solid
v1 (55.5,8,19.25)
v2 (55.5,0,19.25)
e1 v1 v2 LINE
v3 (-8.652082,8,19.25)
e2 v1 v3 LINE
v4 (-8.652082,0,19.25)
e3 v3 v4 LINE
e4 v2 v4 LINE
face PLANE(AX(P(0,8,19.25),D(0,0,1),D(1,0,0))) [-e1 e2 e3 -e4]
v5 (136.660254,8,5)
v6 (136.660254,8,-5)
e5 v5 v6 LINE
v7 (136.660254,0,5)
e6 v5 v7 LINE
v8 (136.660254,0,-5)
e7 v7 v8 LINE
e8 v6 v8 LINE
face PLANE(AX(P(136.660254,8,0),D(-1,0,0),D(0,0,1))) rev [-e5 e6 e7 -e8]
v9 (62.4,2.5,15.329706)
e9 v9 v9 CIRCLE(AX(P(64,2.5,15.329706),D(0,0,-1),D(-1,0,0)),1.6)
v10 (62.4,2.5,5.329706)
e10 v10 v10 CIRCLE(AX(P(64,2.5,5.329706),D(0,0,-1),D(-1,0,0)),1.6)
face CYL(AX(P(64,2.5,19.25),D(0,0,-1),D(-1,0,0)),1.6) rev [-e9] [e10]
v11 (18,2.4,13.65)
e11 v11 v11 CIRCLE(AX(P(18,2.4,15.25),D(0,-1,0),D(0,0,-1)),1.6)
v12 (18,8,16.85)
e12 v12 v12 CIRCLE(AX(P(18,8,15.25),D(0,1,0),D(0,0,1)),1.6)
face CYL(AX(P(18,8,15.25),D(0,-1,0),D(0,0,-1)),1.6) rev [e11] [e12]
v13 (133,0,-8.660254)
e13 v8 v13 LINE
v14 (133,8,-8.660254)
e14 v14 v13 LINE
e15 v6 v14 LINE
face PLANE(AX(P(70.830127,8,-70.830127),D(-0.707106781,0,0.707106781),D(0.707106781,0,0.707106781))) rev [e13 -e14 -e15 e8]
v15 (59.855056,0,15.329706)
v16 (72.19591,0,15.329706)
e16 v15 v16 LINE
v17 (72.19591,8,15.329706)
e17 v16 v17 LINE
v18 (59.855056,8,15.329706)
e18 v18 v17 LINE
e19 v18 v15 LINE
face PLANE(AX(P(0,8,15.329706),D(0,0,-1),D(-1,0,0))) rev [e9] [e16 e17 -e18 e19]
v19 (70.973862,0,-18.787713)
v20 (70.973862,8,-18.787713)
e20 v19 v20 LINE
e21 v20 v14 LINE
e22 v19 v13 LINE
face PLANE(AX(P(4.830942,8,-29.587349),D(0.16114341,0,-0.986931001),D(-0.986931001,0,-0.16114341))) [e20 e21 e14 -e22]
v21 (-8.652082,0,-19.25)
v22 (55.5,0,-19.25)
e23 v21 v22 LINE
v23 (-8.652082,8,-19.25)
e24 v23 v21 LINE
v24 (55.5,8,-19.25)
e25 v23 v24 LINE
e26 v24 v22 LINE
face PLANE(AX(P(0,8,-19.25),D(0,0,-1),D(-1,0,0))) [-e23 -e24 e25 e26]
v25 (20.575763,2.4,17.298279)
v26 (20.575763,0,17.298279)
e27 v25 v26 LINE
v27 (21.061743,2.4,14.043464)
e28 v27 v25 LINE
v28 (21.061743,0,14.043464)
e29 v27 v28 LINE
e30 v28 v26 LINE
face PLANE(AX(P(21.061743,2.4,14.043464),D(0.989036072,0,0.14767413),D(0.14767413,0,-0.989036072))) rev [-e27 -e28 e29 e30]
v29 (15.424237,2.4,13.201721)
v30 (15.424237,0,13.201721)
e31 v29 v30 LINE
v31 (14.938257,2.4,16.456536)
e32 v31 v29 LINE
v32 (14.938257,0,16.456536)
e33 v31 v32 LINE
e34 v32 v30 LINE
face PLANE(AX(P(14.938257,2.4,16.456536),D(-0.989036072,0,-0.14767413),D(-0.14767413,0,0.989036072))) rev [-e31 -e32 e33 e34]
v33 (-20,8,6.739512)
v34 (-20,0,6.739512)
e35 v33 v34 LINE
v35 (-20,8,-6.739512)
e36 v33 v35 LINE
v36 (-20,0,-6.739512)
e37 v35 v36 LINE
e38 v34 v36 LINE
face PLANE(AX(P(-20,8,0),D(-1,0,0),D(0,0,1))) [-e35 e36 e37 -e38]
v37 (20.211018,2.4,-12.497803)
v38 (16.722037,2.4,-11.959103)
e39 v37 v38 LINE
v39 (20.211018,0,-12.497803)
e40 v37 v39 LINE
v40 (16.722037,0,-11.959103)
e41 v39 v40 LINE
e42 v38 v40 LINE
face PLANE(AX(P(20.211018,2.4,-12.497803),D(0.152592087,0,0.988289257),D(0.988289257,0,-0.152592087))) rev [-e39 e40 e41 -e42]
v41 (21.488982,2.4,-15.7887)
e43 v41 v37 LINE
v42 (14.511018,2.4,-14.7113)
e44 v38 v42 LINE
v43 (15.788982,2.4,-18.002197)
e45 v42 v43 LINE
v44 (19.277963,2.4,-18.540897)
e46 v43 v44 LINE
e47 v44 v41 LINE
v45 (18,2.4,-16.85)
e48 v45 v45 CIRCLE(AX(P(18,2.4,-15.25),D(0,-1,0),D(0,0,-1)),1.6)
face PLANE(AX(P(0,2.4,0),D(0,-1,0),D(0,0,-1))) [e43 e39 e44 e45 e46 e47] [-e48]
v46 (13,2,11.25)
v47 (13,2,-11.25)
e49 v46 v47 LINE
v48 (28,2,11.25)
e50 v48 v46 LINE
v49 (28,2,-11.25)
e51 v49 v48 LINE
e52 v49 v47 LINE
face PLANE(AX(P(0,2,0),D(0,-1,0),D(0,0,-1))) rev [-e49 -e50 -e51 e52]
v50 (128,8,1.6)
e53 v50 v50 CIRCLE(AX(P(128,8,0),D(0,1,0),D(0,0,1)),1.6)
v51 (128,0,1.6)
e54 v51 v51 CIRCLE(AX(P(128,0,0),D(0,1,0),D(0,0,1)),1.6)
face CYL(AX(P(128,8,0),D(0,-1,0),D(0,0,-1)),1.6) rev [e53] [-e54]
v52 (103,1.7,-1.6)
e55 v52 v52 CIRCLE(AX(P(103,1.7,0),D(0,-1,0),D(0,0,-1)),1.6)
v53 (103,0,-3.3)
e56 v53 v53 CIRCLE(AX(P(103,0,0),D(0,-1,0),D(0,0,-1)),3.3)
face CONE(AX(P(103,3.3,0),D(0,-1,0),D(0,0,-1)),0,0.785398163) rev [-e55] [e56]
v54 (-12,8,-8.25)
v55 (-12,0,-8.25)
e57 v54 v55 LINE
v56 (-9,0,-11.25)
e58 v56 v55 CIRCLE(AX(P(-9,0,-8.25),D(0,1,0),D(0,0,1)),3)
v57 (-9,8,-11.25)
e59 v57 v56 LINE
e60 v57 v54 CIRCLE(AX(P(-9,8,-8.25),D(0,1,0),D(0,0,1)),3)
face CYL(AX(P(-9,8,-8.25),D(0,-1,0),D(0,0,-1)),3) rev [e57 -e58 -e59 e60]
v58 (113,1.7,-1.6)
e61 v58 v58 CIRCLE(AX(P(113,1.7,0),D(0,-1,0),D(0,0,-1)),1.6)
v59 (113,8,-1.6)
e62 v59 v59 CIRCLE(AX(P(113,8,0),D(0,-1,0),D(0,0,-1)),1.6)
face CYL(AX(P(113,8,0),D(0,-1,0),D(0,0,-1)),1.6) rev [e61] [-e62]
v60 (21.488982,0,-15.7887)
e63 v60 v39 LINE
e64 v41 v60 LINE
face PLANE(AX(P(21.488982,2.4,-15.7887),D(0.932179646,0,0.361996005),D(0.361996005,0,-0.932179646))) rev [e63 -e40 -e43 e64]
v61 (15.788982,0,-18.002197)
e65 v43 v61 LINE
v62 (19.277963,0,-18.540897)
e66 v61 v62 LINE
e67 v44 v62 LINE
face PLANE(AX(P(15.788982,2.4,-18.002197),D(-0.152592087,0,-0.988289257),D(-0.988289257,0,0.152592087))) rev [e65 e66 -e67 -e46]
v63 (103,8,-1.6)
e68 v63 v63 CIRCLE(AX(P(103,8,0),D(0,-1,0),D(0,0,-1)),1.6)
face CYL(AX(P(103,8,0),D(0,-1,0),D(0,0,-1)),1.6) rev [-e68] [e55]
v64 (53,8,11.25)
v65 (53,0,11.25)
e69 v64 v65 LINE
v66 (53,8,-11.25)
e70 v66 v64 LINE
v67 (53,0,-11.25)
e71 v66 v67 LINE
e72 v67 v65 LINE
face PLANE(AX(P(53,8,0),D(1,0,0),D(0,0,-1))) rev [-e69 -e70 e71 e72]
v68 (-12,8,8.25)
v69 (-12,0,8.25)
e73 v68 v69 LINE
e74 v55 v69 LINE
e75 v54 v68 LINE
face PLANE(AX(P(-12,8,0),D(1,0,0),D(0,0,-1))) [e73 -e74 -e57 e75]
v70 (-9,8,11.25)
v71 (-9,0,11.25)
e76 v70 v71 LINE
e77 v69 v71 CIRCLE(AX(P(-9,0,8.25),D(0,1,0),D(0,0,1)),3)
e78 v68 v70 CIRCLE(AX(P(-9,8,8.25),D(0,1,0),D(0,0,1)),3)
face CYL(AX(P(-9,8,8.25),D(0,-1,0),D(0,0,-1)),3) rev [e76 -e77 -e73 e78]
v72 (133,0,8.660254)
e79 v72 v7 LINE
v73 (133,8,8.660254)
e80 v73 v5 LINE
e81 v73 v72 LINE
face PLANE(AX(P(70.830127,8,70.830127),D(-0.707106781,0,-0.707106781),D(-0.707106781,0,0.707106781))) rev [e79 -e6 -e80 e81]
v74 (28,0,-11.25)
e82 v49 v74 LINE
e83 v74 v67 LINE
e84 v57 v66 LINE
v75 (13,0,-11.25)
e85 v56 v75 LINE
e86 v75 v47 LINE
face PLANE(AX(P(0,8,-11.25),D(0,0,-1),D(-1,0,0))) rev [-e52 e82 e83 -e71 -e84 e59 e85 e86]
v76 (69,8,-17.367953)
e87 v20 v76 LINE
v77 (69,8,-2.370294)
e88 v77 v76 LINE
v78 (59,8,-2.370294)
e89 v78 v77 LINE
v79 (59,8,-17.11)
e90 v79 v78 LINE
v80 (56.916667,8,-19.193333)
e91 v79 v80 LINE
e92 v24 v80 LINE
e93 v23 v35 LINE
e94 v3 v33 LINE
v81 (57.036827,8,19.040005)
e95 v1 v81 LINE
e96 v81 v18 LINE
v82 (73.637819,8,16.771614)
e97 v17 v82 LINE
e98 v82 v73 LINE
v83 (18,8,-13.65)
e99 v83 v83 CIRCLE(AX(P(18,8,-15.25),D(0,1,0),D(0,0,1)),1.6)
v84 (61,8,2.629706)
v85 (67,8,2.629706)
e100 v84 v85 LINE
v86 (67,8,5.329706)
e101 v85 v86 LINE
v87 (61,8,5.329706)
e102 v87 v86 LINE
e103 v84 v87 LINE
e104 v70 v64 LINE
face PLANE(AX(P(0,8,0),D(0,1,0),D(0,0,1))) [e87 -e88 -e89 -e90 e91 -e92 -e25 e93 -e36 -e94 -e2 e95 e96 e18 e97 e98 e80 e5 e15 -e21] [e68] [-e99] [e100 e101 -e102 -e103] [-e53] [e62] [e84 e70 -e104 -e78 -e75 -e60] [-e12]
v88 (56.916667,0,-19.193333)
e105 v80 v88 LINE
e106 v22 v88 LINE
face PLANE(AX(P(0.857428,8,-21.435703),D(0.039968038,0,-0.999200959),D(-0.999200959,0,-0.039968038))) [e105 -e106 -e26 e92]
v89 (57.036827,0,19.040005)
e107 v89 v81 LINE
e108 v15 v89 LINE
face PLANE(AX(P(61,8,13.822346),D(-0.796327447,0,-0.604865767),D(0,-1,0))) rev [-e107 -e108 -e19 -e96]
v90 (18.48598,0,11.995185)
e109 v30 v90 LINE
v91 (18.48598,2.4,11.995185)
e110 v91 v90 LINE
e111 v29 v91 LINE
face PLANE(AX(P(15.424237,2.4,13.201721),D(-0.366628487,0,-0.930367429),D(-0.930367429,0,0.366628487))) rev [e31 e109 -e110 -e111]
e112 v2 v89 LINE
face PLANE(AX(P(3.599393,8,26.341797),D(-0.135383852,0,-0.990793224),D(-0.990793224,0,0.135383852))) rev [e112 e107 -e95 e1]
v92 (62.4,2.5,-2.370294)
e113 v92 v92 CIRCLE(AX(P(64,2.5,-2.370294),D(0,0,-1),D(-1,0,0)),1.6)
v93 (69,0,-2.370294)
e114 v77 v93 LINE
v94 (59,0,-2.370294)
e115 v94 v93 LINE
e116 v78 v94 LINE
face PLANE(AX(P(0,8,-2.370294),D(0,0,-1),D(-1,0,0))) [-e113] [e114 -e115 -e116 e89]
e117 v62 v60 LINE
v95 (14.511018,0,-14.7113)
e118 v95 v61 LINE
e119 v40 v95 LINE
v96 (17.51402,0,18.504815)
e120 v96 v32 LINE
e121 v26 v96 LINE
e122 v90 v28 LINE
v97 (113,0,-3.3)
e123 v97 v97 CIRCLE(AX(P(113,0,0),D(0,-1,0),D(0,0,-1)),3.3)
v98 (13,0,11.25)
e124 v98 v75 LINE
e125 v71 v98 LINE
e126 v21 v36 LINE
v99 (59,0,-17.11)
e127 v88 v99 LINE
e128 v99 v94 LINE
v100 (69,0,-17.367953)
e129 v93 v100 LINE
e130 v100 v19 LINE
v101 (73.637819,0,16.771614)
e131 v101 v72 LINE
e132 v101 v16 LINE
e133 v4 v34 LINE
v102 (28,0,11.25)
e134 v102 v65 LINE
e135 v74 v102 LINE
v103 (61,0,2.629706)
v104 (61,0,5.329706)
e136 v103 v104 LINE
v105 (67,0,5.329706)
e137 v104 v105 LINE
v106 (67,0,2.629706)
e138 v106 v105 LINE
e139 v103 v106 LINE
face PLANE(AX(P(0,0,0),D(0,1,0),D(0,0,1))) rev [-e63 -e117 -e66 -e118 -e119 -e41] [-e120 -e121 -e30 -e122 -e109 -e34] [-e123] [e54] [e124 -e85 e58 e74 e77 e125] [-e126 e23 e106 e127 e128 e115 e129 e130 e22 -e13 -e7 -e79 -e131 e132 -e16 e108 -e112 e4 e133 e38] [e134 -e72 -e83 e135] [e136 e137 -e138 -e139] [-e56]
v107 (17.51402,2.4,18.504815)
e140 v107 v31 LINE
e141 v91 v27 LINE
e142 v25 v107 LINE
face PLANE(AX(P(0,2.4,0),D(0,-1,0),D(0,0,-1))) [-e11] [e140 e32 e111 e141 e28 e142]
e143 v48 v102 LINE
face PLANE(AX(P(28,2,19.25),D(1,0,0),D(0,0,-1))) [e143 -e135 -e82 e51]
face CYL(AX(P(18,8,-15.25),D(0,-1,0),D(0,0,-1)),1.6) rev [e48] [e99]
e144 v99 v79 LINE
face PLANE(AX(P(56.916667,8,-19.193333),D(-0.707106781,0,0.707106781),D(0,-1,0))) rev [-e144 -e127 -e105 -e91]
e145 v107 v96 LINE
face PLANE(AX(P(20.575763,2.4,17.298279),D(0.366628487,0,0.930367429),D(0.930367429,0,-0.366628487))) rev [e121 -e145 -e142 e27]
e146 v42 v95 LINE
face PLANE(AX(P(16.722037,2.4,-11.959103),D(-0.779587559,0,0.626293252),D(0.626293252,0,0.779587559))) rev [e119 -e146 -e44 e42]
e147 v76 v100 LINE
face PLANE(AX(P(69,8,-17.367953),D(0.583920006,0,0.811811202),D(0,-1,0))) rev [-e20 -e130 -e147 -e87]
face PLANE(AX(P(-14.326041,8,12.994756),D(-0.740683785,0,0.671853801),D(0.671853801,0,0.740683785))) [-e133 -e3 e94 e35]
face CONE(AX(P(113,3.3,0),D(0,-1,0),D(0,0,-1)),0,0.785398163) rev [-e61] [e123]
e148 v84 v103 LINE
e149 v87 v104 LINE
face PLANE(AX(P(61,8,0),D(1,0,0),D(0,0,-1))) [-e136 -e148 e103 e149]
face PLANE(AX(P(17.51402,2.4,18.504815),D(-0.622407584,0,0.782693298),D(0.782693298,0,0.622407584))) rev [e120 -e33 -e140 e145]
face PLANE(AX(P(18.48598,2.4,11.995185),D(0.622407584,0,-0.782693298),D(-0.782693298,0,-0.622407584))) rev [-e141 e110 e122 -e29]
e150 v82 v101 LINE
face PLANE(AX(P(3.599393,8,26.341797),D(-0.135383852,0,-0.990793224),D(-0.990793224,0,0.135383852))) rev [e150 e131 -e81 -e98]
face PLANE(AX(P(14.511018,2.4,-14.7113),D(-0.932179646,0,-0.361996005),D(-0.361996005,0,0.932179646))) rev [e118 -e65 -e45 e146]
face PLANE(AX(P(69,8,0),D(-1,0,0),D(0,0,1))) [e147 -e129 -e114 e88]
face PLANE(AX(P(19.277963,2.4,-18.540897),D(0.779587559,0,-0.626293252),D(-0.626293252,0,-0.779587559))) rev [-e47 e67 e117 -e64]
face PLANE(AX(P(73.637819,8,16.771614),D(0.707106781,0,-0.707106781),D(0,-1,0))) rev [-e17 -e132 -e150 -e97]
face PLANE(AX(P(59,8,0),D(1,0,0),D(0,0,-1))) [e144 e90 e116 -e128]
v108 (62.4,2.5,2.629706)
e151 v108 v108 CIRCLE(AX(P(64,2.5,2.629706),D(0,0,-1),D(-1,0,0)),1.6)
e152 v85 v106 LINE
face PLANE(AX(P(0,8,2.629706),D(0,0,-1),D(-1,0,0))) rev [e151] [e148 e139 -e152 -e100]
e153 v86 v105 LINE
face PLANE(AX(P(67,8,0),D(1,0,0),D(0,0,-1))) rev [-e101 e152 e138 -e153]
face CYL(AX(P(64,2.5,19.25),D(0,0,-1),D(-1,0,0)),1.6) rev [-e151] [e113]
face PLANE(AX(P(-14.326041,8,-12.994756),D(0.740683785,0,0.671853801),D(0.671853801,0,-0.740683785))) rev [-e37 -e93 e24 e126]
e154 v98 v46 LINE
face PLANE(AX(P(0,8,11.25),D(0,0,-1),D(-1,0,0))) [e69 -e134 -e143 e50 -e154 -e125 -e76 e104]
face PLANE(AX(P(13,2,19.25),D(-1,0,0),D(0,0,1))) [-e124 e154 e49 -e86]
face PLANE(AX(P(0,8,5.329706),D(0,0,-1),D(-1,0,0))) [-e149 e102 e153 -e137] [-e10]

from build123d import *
from OCP.BRepFilletAPI import BRepFilletAPI_MakeChamfer

# Parameters (mm, degrees)
SKETCH2_R           = 1.6
SKETCH2_W           = 6
SKETCH2_H           = 2.7
BOSS_EXTRUDE1_DEPTH = 8
SKETCH4_W           = 15
SKETCH4_H           = 38.5
BOSS_EXTRUDE2_DEPTH = 2
CHAMFER2_SIZE       = 2
CHAMFER2_SIZE2      = 2.084999334
CHAMFER2_SIZE2_2    = 1.742047362
SKETCH3_R           = 1.6
CUT_EXTRUDE1_DEPTH  = 139.590988742
CUT_EXTRUDE2_DEPTH  = 2.4
LPATTERN1_COUNT     = 2
LPATTERN1_PITCH     = 10
SKETCH7_R           = 1.6
CUT_EXTRUDE3_DEPTH  = 139.241048657
CHAMFER4_SIZE       = 4.676123657
CHAMFER4_SIZE_2     = 4
CHAMFER5_SIZE       = 1.775919651
CHAMFER5_SIZE_2     = 2


with BuildPart() as part:
    # Sketch2 → Boss-Extrude1 (new body)
    with BuildSketch(Plane(origin=(0, 0, 0), x_dir=(1, 0, 0), z_dir=(0, 1, 0))):
        Polygon((-8.652082119, -19.25), (55.5, -19.25), (61, -18.498469641), (61, -15.329705671), (71.8782498, -15.329705671), (71.8782498, -17.012045101), (133, -8.660254038), (136.660254038, -5), (136.660254038, 0), (136.660254038, 5), (133, 8.660254038), (69, 19.11), (69, 2.370294329), (59, 2.370294329), (59, 19.11), (55.5, 19.25), (-8.652082119, 19.25), (-20, 6.739512223), (-20, -6.739512223), align=None)
        with Locations(Location((18, -15.25, 0), (0, 0, 270))):
            Circle(SKETCH2_R, mode=Mode.SUBTRACT)
        with BuildLine():
            ThreePointArc((-12, 8.25), (-11.121320344, 10.371320344), (-9, 11.25))
            Line((-9, 11.25), (53, 11.25))
            Line((53, 11.25), (53, -11.25))
            Line((53, -11.25), (-9, -11.25))
            ThreePointArc((-9, -11.25), (-11.121320344, -10.371320344), (-12, -8.25))
            Line((-12, -8.25), (-12, 8.25))
        make_face(mode=Mode.SUBTRACT)
        with Locations((64, -3.979705671)):
            Rectangle(SKETCH2_W, SKETCH2_H, mode=Mode.SUBTRACT)
        with Locations(Location((128, 0, 0), (0, 0, 270))):
            Circle(SKETCH2_R, mode=Mode.SUBTRACT)
        with Locations(Location((18, 15.25, 0), (0, 0, 270))):
            Circle(SKETCH2_R, mode=Mode.SUBTRACT)
    extrude(amount=BOSS_EXTRUDE1_DEPTH)

    # Sketch4 → Boss-Extrude2 (add)
    with BuildSketch(Plane(origin=(0, 0, 0), x_dir=(-1, 0, 0), z_dir=(0, -1, 0))):
        with Locations((-20.5, 0)):
            Rectangle(SKETCH4_W, SKETCH4_H)
    extrude(amount=-BOSS_EXTRUDE2_DEPTH)

    # Chamfer2: one chamfer whose edges measure the first distance from different faces: ONE call of the kernel's chamfer builder (chamfer() names one face for all edges)
    chamfer2_edges_1 = [part.edges().sort_by_distance(p)[0] for p in [
        (59, 4, -19.11),
    ]]
    chamfer2_side_1 = [part.faces().sort_by_distance(p)[0] for p in [
        (59, 4, -10.740147164),
    ]]
    chamfer2_edges_2 = [part.edges().sort_by_distance(p)[0] for p in [
        (69, 4, -19.11),
    ]]
    chamfer2_side_2 = [part.faces().sort_by_distance(p)[0] for p in [
        (101, 4, -13.885127019),
    ]]
    chamfer2 = BRepFilletAPI_MakeChamfer(part.part.solid().wrapped)
    for e in chamfer2_edges_1:
        chamfer2.Add(CHAMFER2_SIZE, CHAMFER2_SIZE2, e.wrapped, chamfer2_side_1[0].wrapped)  # the first distance lies on this face
    for e in chamfer2_edges_2:
        chamfer2.Add(CHAMFER2_SIZE, CHAMFER2_SIZE2_2, e.wrapped, chamfer2_side_2[0].wrapped)  # the first distance lies on this face
    add(Compound.cast(chamfer2.Shape()), mode=Mode.REPLACE)

    # Sketch3 → Cut-Extrude1 (cut, through all)
    with BuildSketch(Plane(origin=(0, 0, -2.370294329), x_dir=(-1, 0, 0), z_dir=(0, 0, -1))):
        with Locations((-64, 2.5)):
            Circle(SKETCH3_R)
    extrude(amount=-CUT_EXTRUDE1_DEPTH, mode=Mode.SUBTRACT)

    # Sketch5 → Cut-Extrude2 (cut)
    with BuildSketch(Plane.XZ):
        Polygon((21.061742947, 14.043463581), (20.575762662, 17.298278962), (17.514019716, 18.504815381), (14.938257053, 16.456536419), (15.424237338, 13.201721038), (18.485980284, 11.995184619), align=None)
        Polygon((21.488981661, -15.788699565), (20.211018339, -12.49780303), (16.722036677, -11.959103466), (14.511018339, -14.711300435), (15.788981661, -18.00219697), (19.277963323, -18.540896534), align=None)
    extrude(amount=-CUT_EXTRUDE2_DEPTH, mode=Mode.SUBTRACT)

    # Sketch6 → Cut-Revolve1 (revolve, cut)
    with BuildSketch(Plane.XY, mode=Mode.PRIVATE) as cut_revolve1_sk:
        Polygon((113, 0), (113, 3.3), (109.7, 0), align=None)
    cut_revolve1 = revolve(cut_revolve1_sk.sketch.rotate(Axis((113, 0, 0), (0, 1, 0)), 270), axis=Axis((113, 0, 0), (0, 1, 0)), mode=Mode.SUBTRACT)

    # LPattern1: Cut-Revolve1 ×2
    with Locations(*[(-i * LPATTERN1_PITCH, 0, 0) for i in range(1, LPATTERN1_COUNT)]):
        add(cut_revolve1, mode=Mode.SUBTRACT)

    # Sketch7 → Cut-Extrude3 (cut, through all)
    with BuildSketch(Plane.XZ):
        with Locations(Location((113, 0, 0), (0, 0, 270))):
            Circle(SKETCH7_R)
        with Locations(Location((103, 0, 0), (0, 0, 270))):
            Circle(SKETCH7_R)
    extrude(amount=-CUT_EXTRUDE3_DEPTH, mode=Mode.SUBTRACT)

    # Chamfer4
    # the kernel refuses this chamfer: 4.676123657, 4 mm, written as the material it takes off along each edge
    with BuildSketch(Plane(origin=(61, -12.065997261, 18.498469641), x_dir=(0.023441304216062758, 0, -0.9997252148748925), z_dir=(0, 1, 0))) as chamfer4_piece_1_section:
        Polygon((CHAMFER4_SIZE * 0.999725214943, CHAMFER4_SIZE * 0.0234413042177), (-CHAMFER4_SIZE_2 * 0.158572136068, CHAMFER4_SIZE_2 * 0.98734739462), (0, 0), align=None)
    chamfer4_piece_1 = extrude(amount=32.131994523, mode=Mode.PRIVATE)
    chamfer4_piece_1 = split(chamfer4_piece_1, bisect_by=Plane(origin=(59.577955858, 4, 15.329705671), z_dir=(0, 0, 1)), keep=Keep.TOP, mode=Mode.PRIVATE)
    add(chamfer4_piece_1, mode=Mode.SUBTRACT)

    # Chamfer5
    # the kernel refuses this chamfer: 2, 1.775919651 mm, written as the material it takes off along each edge
    with BuildSketch(Plane(origin=(71.8782498, -5.143365976, 17.012045101), x_dir=(0.9949144836162346, 0, -0.10072323610091762), z_dir=(0, 1, 0))) as chamfer5_piece_1_section:
        Polygon((CHAMFER5_SIZE * 0.999390828495, CHAMFER5_SIZE * 0.0348994555423), (CHAMFER5_SIZE_2 * 0.100723236101, CHAMFER5_SIZE_2 * 0.994914483616), (0, 0), align=None)
    chamfer5_piece_1 = extrude(amount=18.286731952, mode=Mode.PRIVATE)
    chamfer5_piece_1 = split(chamfer5_piece_1, bisect_by=Plane(origin=(72.478635966, 4, 15.329705671), z_dir=(0, 0, 1)), keep=Keep.TOP, mode=Mode.PRIVATE)
    add(chamfer5_piece_1, mode=Mode.SUBTRACT)


solid = part.part
